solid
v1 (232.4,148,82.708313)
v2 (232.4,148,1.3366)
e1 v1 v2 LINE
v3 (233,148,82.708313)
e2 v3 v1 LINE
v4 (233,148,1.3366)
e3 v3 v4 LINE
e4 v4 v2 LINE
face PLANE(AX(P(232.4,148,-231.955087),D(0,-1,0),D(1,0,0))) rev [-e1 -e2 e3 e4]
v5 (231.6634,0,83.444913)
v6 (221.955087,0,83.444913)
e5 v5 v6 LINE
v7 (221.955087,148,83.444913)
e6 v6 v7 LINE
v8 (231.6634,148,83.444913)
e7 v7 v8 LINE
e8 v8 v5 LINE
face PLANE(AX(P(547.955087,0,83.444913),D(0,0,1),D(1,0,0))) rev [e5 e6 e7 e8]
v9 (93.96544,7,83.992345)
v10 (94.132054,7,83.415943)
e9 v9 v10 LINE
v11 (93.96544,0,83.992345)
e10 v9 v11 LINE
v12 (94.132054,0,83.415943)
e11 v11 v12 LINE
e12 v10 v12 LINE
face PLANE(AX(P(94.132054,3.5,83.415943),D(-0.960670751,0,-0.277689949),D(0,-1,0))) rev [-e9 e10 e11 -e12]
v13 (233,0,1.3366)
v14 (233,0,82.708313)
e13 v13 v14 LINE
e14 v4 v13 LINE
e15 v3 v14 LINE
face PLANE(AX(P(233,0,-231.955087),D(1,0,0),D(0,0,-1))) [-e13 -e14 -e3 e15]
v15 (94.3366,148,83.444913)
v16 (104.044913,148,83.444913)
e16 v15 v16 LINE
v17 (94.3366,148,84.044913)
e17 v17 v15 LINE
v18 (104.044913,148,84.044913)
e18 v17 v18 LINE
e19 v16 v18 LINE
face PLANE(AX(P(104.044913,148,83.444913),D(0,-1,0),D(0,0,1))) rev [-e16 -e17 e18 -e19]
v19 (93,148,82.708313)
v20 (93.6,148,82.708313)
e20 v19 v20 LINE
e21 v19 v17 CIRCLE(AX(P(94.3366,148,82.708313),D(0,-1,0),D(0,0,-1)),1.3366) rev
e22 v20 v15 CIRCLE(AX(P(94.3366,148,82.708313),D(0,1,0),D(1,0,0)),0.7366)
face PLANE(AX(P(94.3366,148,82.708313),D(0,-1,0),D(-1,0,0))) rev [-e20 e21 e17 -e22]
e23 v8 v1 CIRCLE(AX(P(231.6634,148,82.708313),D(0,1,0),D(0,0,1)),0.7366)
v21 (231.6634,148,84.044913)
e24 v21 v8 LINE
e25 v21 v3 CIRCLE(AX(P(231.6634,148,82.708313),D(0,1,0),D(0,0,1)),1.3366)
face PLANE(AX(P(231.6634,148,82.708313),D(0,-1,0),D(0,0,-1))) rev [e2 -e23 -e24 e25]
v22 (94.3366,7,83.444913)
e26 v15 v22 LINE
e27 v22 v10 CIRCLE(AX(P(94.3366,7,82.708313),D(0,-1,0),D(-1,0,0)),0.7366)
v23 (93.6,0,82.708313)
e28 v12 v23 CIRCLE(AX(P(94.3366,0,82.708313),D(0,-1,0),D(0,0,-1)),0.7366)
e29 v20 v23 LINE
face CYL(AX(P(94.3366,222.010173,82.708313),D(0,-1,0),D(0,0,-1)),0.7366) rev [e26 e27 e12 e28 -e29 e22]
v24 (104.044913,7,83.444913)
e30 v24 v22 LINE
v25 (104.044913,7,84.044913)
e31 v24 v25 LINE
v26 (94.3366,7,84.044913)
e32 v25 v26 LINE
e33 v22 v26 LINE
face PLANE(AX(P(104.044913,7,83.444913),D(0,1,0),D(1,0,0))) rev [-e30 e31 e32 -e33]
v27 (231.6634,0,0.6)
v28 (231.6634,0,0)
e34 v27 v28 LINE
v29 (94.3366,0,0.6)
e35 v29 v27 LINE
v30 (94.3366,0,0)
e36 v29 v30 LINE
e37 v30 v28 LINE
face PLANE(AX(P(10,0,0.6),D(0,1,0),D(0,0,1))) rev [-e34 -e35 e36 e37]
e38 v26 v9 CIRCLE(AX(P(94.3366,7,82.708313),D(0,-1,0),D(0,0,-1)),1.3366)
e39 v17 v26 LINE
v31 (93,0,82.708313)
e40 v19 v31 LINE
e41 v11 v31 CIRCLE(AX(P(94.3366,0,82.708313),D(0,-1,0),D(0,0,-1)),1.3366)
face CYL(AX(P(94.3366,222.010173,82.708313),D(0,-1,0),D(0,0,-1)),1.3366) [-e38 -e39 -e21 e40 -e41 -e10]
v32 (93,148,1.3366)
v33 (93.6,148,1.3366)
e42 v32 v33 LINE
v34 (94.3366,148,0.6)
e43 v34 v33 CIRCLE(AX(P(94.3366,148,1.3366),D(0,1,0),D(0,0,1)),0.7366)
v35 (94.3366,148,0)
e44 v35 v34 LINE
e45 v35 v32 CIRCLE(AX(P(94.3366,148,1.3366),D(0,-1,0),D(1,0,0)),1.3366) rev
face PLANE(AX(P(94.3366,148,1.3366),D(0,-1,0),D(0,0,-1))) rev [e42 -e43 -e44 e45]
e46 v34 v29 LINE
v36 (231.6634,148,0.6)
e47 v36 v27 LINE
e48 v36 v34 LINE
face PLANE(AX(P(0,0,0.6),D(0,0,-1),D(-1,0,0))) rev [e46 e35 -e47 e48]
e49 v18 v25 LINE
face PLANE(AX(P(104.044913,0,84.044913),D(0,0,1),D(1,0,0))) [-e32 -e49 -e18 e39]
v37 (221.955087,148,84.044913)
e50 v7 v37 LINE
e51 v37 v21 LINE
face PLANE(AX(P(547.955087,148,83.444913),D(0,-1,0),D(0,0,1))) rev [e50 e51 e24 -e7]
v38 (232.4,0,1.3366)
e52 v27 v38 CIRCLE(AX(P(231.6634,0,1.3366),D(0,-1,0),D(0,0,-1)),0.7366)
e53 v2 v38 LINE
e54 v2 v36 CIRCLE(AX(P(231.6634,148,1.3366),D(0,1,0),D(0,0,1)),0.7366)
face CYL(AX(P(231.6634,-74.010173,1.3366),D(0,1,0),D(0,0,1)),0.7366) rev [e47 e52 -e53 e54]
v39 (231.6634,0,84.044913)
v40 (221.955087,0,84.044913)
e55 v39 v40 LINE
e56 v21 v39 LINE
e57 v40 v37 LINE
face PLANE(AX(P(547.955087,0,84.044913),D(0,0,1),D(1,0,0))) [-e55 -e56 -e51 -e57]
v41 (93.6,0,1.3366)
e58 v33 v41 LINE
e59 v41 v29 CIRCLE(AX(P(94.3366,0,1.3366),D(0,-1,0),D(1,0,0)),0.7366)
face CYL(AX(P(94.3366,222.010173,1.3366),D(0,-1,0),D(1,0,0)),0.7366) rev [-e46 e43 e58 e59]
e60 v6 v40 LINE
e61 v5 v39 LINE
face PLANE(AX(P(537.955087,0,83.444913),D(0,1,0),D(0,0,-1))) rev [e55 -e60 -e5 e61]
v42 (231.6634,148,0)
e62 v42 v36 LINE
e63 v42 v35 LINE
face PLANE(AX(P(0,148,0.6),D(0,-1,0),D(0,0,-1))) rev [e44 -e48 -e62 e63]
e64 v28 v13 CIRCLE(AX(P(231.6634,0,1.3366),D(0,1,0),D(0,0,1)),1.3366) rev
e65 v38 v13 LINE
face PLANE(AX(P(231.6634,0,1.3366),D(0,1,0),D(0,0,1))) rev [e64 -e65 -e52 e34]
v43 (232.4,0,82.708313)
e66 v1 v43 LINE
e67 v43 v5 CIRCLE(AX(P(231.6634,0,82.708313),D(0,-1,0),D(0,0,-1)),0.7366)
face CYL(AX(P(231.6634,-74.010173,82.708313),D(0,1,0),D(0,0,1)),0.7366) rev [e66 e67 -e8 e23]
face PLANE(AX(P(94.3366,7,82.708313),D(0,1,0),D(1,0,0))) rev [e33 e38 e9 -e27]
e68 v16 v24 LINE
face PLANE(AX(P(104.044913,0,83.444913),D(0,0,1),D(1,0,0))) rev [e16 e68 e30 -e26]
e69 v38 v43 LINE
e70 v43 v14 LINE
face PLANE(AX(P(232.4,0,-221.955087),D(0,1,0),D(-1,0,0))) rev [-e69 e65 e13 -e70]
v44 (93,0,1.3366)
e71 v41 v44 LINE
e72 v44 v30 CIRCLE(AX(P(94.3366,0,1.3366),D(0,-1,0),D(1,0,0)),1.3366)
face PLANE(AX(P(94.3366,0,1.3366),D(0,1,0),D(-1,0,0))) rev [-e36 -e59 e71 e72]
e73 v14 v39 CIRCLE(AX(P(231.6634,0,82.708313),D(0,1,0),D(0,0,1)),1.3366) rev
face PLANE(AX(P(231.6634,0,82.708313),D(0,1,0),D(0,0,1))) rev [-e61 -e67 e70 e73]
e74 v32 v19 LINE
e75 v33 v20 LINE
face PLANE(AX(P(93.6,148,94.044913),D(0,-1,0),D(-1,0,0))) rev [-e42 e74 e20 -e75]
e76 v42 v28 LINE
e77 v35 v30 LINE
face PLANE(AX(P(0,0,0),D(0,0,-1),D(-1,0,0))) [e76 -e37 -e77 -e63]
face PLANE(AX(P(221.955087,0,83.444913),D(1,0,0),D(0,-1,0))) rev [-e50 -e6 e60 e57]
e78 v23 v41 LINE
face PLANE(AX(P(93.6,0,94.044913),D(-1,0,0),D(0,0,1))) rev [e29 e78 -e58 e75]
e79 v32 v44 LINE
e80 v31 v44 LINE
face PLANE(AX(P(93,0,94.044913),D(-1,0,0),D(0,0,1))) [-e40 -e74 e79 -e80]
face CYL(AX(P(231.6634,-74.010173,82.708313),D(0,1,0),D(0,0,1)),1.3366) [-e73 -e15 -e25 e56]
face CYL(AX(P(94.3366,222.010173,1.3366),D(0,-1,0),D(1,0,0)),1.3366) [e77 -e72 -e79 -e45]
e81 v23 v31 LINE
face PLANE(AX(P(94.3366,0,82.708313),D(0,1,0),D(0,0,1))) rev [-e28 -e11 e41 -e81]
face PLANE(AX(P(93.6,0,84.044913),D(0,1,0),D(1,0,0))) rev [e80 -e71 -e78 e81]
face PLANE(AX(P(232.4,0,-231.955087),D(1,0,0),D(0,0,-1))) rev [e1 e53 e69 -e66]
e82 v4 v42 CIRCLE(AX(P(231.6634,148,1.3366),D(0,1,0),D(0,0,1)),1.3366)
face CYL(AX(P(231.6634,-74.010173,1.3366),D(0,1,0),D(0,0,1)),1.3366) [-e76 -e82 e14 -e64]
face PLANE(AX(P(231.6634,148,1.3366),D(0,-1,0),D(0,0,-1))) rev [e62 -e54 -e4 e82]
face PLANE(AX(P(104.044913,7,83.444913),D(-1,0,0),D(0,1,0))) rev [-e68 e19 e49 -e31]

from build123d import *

# Parameters (mm, degrees)
BASE_FLANGE1_DEPTH     = 0.6
SKETCHED_BEND1_DEPTH   = 148
SKETCHED_START         = 7
SKETCHED_BEND1_2_DEPTH = 141
SKETCHED_BEND1_3_DEPTH = 7


# Read off the part's stored shape, not the designer's step: Sketched Bend1
# Sheet-metal steps are written as plain solids
with BuildPart() as part:
    # Sketch1 → Base-Flange1 (new body)
    with BuildSketch(Plane.XY):
        Polygon((0, 7), (10, 7), (10, 0), (326, 0), (326, 148), (0, 148), align=None)
    extrude(amount=BASE_FLANGE1_DEPTH)

    # Sketched Bend1 outline → Sketched Bend1 (cut)
    with BuildSketch(Plane(origin=(0, 0, 0), x_dir=(1, 0, 0), z_dir=(0, 1, 0))):
        with BuildLine():
            ThreePointArc((93.221288384, -0.6), (93.703370184, -0.159519051), (94.3366, 0))
            Line((94.3366, 0), (0, 0))
            Line((0, 0), (0, -0.6))
            Line((0, -0.6), (93.221288384, -0.6))
        make_face()
        with BuildLine():
            ThreePointArc((231.6634, 0), (232.296629816, -0.159519051), (232.778711616, -0.6))
            Line((232.778711616, -0.6), (326, -0.6))
            Line((326, -0.6), (326, 0))
            Line((326, 0), (231.6634, 0))
        make_face()
    extrude(amount=SKETCHED_BEND1_DEPTH, mode=Mode.SUBTRACT)

    # Sketched Bend1 2 outline → Sketched Bend1 2 (add)
    with BuildSketch(Plane(origin=(0, 0, 0), x_dir=(1, 0, 0), z_dir=(0, 1, 0)).offset(SKETCHED_START)):
        with BuildLine():
            Line((93.6, -82.708312528), (93.6, -1.3366))
            ThreePointArc((93.6, -1.3366), (93.815745145, -0.815745145), (94.3366, -0.6))
            Line((94.3366, -0.6), (93.221288384, -0.6))
            ThreePointArc((93.221288384, -0.6), (93.056516982, -0.952039176), (93, -1.3366))
            Line((93, -1.3366), (93, -82.708312528))
            ThreePointArc((93, -82.708312528), (93.391481076, -83.653431451), (94.3366, -84.044912528))
            Line((94.3366, -84.044912528), (104.044912528, -84.044912528))
            Line((104.044912528, -84.044912528), (104.044912528, -83.444912528))
            Line((104.044912528, -83.444912528), (94.3366, -83.444912528))
            ThreePointArc((94.3366, -83.444912528), (93.815745145, -83.229167383), (93.6, -82.708312528))
        make_face()
        with BuildLine():
            Line((232.778711616, -0.6), (231.6634, -0.6))
            ThreePointArc((231.6634, -0.6), (232.184254855, -0.815745145), (232.4, -1.3366))
            Line((232.4, -1.3366), (232.4, -82.708312528))
            ThreePointArc((232.4, -82.708312528), (232.184254855, -83.229167383), (231.6634, -83.444912528))
            Line((231.6634, -83.444912528), (221.955087472, -83.444912528))
            Line((221.955087472, -83.444912528), (221.955087472, -84.044912528))
            Line((221.955087472, -84.044912528), (231.6634, -84.044912528))
            ThreePointArc((231.6634, -84.044912528), (232.608518924, -83.653431451), (233, -82.708312528))
            Line((233, -82.708312528), (233, -1.3366))
            ThreePointArc((233, -1.3366), (232.943483018, -0.952039176), (232.778711616, -0.6))
        make_face()
    extrude(amount=SKETCHED_BEND1_2_DEPTH)

    # Sketched Bend1 3 outline → Sketched Bend1 3 (add)
    with BuildSketch(Plane(origin=(0, 0, 0), x_dir=(1, 0, 0), z_dir=(0, 1, 0))):
        with BuildLine():
            Line((93.6, -82.708312528), (93.6, -1.3366))
            ThreePointArc((93.6, -1.3366), (93.815745145, -0.815745145), (94.3366, -0.6))
            Line((94.3366, -0.6), (93.221288384, -0.6))
            ThreePointArc((93.221288384, -0.6), (93.056516982, -0.952039176), (93, -1.3366))
            Line((93, -1.3366), (93, -82.708312528))
            ThreePointArc((93, -82.708312528), (93.268285315, -83.511558003), (93.965439614, -83.992345054))
            Line((93.965439614, -83.992345054), (94.132053583, -83.415942603))
            ThreePointArc((94.132053583, -83.415942603), (93.747851985, -83.150980953), (93.6, -82.708312528))
        make_face()
        with BuildLine():
            Line((232.778711616, -0.6), (231.6634, -0.6))
            ThreePointArc((231.6634, -0.6), (232.184254855, -0.815745145), (232.4, -1.3366))
            Line((232.4, -1.3366), (232.4, -82.708312528))
            ThreePointArc((232.4, -82.708312528), (232.184254855, -83.229167383), (231.6634, -83.444912528))
            Line((231.6634, -83.444912528), (221.955087472, -83.444912528))
            Line((221.955087472, -83.444912528), (221.955087472, -84.044912528))
            Line((221.955087472, -84.044912528), (231.6634, -84.044912528))
            ThreePointArc((231.6634, -84.044912528), (232.608518924, -83.653431451), (233, -82.708312528))
            Line((233, -82.708312528), (233, -1.3366))
            ThreePointArc((233, -1.3366), (232.943483018, -0.952039176), (232.778711616, -0.6))
        make_face()
    extrude(amount=SKETCHED_BEND1_3_DEPTH)


solid = part.part
